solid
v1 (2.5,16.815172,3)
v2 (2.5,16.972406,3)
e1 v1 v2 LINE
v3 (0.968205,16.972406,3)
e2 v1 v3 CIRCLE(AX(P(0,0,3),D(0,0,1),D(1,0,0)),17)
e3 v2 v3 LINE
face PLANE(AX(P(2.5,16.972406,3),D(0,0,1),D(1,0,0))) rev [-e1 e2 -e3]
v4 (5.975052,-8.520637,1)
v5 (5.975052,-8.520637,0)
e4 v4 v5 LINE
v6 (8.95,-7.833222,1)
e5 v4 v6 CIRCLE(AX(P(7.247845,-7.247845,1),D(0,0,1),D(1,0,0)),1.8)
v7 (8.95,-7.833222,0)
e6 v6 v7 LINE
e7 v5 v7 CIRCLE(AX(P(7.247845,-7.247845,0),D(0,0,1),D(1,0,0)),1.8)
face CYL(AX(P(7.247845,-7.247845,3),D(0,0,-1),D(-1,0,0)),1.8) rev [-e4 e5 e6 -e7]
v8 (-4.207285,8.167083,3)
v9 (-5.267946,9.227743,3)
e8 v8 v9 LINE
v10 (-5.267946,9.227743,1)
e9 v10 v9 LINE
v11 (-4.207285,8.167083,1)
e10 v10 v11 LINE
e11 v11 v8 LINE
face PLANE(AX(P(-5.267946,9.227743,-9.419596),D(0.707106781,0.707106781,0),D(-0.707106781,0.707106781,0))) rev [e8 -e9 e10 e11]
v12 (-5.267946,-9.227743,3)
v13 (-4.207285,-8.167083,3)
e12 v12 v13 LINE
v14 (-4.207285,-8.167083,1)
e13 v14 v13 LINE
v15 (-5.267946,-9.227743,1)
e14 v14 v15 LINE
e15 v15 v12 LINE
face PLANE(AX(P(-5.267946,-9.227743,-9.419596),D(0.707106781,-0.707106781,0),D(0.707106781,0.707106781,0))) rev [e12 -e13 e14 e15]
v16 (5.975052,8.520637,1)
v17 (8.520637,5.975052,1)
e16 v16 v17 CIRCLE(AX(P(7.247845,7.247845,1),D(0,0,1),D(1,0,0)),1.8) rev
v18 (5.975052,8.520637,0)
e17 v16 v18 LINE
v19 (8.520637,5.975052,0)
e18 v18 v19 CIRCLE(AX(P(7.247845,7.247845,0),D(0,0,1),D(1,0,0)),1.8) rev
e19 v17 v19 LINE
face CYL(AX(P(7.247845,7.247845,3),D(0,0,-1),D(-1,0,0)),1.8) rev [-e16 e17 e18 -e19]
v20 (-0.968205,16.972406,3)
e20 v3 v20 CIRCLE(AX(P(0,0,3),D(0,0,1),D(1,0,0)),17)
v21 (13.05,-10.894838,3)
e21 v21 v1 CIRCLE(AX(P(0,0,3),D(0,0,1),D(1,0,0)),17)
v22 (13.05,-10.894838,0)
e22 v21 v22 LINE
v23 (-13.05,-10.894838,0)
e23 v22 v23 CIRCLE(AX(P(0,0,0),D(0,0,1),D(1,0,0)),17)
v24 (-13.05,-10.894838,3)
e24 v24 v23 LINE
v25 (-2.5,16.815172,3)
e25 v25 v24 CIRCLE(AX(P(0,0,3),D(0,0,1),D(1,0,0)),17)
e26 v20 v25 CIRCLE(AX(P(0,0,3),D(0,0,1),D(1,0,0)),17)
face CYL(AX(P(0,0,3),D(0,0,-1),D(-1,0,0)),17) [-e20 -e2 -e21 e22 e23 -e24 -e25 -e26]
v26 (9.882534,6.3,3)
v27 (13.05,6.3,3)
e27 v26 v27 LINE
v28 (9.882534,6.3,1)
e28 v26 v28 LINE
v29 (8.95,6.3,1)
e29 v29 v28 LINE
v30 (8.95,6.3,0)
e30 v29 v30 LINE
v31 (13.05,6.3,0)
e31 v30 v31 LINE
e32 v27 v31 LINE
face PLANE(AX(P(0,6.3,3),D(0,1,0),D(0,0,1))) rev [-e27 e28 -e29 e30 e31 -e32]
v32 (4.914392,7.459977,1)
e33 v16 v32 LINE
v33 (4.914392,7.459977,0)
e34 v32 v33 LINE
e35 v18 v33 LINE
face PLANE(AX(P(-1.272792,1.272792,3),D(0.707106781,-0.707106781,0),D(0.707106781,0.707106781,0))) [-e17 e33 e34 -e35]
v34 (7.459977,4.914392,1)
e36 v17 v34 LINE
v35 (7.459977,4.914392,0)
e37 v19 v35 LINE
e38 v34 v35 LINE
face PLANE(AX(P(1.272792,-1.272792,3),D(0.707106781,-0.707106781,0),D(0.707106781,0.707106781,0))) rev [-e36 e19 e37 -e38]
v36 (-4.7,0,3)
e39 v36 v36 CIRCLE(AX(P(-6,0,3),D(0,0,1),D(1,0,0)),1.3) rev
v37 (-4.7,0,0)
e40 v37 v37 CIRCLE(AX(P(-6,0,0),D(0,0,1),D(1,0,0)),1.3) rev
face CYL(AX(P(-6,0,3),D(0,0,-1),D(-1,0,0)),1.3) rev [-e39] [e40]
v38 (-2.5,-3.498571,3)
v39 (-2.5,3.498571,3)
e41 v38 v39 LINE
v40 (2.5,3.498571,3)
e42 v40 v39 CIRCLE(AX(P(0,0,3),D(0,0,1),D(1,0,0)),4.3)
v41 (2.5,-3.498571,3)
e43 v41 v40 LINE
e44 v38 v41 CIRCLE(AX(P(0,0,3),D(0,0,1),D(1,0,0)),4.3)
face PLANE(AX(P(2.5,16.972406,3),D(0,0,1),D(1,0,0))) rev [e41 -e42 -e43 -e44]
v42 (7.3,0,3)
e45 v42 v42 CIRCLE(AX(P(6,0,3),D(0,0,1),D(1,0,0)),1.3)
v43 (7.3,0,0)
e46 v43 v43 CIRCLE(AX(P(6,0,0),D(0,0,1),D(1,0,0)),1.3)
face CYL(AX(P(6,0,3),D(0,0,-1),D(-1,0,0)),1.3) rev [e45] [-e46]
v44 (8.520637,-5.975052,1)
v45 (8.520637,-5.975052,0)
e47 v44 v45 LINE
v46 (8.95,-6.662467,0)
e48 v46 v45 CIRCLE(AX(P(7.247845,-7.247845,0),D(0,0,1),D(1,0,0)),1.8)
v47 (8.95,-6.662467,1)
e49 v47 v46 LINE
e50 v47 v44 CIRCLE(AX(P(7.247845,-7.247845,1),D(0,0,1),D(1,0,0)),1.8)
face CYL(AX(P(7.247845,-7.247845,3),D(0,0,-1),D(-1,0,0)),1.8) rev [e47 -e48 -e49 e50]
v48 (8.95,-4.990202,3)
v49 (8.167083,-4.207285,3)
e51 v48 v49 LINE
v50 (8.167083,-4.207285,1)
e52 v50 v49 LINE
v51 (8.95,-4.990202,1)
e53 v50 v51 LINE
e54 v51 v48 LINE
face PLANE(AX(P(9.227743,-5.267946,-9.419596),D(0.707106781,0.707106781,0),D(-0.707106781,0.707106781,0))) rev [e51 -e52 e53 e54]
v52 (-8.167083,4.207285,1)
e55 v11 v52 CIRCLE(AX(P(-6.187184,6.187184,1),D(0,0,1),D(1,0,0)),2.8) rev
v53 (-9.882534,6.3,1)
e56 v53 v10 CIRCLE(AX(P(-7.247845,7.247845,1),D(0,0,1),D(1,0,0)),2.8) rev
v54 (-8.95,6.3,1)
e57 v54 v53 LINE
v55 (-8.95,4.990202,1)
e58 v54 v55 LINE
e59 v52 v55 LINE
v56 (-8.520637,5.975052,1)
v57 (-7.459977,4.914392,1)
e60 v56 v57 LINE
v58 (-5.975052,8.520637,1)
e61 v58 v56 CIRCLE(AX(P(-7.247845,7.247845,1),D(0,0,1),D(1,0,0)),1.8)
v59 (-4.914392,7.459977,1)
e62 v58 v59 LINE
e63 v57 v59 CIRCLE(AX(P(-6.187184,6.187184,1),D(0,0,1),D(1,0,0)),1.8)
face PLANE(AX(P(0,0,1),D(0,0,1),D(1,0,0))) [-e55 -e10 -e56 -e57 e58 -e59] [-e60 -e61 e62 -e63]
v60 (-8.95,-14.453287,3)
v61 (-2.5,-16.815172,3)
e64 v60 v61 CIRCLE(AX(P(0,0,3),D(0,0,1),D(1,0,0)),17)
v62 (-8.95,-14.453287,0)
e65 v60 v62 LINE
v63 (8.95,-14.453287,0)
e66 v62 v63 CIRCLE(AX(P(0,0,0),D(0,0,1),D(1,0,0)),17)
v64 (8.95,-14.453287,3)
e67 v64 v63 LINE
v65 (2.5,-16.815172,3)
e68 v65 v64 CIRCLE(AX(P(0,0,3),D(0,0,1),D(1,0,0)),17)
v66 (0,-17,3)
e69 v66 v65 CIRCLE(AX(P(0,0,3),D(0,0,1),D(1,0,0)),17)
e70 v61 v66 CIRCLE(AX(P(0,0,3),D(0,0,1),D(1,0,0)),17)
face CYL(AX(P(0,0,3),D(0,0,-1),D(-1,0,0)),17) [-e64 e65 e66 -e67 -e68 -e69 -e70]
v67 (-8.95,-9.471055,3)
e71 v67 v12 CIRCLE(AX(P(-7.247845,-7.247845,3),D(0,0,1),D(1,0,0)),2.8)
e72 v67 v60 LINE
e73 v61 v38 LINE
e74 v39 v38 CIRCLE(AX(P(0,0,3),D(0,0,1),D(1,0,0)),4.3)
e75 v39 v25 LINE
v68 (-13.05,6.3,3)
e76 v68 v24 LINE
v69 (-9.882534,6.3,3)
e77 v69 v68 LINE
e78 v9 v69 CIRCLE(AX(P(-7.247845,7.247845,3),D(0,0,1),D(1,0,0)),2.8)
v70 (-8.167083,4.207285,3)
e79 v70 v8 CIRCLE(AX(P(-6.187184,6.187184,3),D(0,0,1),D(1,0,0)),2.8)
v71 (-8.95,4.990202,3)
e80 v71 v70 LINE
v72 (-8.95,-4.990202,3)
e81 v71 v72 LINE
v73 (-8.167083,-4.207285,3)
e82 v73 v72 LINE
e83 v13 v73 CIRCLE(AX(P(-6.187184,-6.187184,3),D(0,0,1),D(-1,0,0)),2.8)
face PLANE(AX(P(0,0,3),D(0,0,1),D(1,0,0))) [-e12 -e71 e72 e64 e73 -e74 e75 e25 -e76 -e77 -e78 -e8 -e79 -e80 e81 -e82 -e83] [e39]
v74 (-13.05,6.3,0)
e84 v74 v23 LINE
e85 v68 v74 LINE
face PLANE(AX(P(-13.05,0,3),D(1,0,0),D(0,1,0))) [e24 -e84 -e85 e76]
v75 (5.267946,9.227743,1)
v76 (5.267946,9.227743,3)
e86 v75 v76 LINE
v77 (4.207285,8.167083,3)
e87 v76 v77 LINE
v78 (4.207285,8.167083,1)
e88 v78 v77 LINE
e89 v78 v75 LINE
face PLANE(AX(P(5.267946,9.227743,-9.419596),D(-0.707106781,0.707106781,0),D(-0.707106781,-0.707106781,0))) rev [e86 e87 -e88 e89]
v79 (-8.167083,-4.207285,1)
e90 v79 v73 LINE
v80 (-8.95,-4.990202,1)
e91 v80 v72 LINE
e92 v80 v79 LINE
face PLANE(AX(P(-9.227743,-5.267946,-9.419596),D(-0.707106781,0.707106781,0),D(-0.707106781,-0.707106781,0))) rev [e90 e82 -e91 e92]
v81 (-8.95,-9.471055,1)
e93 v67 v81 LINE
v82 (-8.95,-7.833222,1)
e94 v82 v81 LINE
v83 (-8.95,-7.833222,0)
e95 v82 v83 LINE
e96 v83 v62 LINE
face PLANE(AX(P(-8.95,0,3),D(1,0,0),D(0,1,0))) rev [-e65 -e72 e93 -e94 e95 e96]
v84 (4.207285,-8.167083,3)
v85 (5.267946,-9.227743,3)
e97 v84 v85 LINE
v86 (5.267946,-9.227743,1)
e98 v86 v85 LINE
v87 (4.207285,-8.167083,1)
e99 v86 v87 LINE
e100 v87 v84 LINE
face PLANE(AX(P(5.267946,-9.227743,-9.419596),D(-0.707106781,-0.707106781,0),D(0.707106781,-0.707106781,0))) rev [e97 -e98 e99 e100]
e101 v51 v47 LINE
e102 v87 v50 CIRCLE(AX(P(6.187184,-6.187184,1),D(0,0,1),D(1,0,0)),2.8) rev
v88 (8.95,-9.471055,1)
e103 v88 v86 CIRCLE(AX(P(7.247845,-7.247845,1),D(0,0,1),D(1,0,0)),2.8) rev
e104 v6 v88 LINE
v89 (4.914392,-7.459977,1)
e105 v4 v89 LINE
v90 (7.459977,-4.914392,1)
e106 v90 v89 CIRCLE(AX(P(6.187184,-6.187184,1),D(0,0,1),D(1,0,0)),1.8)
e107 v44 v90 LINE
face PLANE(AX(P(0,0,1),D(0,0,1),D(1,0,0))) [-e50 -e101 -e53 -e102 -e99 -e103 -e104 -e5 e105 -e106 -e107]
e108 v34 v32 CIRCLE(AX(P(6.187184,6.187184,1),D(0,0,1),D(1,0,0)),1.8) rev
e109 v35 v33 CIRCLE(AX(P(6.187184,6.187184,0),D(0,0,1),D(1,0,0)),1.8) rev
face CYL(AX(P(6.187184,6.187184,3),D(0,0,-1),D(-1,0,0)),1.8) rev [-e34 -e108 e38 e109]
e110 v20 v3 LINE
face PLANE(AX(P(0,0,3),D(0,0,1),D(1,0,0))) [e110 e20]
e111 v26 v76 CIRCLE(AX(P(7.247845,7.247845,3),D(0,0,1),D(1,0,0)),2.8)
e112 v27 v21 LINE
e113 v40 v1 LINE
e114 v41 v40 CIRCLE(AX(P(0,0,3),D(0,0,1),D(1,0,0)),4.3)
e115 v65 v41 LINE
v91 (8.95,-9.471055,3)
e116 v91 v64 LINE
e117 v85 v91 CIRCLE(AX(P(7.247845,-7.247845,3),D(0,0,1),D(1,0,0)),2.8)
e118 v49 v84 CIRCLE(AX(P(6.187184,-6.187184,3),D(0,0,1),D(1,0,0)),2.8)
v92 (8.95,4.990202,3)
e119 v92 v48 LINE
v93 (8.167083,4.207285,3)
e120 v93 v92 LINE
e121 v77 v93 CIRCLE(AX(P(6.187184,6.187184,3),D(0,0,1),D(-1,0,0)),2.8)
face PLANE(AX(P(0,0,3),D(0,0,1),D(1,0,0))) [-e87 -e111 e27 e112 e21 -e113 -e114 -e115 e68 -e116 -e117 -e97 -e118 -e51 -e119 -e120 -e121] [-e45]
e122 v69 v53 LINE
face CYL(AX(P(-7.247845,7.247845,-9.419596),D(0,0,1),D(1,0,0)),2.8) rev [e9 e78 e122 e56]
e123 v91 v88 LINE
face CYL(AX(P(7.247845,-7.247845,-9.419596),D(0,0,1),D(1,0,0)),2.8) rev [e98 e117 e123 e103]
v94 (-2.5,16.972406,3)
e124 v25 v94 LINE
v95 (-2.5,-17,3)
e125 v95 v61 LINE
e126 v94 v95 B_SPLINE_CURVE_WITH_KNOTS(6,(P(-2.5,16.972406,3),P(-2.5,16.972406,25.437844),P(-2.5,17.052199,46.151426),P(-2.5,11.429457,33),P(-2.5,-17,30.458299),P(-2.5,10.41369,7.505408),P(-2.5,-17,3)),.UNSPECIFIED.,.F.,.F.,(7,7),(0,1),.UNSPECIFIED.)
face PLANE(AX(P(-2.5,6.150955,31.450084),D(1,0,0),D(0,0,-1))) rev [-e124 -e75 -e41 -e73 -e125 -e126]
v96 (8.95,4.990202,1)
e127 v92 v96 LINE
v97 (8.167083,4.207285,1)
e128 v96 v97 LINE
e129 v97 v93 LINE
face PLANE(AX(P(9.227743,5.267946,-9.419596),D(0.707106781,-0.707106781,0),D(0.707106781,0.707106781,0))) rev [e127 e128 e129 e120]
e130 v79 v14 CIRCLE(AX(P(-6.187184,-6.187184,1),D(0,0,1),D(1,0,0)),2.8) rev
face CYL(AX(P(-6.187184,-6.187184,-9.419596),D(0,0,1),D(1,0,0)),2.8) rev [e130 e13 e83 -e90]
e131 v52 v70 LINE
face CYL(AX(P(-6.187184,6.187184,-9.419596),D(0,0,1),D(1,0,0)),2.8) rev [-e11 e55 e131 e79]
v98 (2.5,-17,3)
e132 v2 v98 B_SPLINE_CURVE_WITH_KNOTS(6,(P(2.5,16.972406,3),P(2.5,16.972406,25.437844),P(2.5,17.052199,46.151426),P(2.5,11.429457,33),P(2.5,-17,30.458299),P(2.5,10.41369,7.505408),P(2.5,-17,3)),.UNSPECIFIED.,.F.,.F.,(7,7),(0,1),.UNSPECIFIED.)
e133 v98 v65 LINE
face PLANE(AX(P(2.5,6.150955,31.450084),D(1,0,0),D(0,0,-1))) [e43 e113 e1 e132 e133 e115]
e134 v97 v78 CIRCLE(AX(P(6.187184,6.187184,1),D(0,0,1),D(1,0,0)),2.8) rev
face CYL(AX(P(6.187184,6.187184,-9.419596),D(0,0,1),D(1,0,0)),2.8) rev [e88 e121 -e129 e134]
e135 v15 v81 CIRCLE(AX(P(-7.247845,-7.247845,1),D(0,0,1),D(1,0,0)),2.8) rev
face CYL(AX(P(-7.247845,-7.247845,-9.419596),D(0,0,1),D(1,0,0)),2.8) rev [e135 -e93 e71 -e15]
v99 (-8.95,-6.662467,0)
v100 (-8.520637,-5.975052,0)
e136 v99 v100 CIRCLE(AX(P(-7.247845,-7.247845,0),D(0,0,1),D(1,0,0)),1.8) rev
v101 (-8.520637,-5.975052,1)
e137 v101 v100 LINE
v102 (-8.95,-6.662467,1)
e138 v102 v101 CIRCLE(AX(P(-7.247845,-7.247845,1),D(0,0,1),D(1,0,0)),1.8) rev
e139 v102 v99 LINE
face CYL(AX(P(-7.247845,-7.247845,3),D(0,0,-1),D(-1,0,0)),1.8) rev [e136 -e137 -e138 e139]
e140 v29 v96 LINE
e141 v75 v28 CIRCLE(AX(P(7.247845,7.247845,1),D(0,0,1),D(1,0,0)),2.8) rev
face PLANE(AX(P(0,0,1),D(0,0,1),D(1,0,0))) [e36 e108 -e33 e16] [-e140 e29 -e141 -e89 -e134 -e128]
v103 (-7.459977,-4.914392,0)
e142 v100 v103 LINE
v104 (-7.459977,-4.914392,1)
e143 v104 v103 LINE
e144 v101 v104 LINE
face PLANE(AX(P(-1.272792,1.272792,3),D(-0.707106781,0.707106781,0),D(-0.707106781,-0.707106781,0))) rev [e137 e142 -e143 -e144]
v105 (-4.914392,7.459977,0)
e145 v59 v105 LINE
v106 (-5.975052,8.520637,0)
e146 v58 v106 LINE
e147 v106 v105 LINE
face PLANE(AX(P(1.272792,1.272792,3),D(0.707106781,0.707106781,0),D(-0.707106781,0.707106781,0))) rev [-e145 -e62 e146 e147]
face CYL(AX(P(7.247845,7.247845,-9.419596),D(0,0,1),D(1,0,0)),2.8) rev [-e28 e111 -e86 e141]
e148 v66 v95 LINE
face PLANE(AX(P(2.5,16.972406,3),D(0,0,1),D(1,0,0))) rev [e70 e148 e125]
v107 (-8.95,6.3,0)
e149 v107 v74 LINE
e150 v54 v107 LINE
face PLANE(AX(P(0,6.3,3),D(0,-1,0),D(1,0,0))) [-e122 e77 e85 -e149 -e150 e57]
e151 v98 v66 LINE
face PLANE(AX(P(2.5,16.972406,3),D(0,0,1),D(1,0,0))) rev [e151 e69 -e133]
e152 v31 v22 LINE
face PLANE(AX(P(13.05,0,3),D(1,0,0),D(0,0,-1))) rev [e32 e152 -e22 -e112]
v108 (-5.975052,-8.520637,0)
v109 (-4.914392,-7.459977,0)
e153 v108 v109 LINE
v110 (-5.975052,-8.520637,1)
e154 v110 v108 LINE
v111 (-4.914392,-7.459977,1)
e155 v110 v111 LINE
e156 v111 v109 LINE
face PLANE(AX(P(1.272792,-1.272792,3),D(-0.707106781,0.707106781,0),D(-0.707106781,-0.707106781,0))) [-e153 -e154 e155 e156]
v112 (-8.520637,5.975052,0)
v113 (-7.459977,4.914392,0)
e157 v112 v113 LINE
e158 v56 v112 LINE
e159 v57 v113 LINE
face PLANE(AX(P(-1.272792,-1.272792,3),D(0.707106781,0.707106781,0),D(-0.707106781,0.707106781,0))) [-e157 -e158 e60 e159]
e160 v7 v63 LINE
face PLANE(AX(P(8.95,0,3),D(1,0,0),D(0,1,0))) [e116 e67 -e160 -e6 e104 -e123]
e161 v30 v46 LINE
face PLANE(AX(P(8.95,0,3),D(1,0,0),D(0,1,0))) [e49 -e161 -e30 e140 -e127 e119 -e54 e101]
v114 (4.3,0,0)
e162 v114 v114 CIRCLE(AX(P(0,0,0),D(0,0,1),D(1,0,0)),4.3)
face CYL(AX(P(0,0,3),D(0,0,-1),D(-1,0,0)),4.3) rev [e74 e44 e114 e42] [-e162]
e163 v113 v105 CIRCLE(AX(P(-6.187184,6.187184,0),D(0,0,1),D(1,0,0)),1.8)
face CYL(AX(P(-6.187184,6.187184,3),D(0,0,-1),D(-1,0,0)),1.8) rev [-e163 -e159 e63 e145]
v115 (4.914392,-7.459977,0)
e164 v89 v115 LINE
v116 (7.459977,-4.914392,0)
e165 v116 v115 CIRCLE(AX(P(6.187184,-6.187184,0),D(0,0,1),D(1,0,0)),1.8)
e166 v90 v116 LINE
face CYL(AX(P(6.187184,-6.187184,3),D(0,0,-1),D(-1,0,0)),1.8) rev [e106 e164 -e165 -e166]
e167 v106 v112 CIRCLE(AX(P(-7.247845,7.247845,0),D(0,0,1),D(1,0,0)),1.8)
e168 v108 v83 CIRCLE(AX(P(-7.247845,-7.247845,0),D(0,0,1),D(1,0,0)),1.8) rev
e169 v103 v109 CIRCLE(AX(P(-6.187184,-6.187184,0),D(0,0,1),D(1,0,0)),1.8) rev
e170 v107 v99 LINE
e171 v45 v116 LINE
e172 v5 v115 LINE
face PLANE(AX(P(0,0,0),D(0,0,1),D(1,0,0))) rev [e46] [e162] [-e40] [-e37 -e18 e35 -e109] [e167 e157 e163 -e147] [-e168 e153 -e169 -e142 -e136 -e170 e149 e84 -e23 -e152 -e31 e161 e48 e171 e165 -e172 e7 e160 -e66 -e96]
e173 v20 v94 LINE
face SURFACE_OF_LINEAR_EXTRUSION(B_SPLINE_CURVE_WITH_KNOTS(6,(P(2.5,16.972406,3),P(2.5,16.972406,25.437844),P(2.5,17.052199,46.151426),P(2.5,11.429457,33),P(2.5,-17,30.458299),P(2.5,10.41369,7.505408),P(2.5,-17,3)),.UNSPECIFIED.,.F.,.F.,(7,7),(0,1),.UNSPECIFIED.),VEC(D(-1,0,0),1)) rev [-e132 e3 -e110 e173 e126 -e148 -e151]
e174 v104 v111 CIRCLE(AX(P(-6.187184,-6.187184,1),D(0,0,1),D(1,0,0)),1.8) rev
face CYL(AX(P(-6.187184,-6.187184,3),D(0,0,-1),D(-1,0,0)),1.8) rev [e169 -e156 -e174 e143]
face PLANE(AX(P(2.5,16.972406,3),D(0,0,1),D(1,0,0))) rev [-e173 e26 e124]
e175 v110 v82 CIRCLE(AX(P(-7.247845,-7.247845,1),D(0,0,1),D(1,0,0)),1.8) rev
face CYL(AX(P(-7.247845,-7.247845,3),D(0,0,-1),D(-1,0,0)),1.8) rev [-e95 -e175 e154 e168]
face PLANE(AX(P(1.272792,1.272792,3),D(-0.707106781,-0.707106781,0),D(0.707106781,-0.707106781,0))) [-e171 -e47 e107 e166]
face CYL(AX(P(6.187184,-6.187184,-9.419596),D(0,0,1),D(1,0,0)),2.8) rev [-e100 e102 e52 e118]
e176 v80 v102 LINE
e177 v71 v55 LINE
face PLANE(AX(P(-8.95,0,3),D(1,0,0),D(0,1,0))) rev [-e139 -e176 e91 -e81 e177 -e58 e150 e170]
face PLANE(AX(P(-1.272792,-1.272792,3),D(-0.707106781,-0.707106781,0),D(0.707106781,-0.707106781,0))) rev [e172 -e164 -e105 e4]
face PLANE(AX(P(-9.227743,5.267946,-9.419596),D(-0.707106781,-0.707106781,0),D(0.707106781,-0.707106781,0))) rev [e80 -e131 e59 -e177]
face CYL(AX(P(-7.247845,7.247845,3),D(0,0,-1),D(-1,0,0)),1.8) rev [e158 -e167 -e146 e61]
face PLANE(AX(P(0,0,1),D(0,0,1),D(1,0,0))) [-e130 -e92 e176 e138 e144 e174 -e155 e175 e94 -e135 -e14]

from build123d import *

# Parameters (mm, degrees)
SKETCH_2_R          = 1.3
SKETCH_2_R_2        = 4.3
EXTRUDE_1_DEPTH     = 3
CUT_EXTRUDE_1_DEPTH = 2
EXTRUDE_START       = -2.5
EXTRUDE_2_DEPTH     = 5


# Read off the part's stored shape, not the designer's step: 凸台-拉伸2
with BuildPart() as part:
    # 草图2 → 凸台-拉伸1 (new body)
    with BuildSketch(Plane.XY):
        with BuildLine():
            Line((8.95, -6.662467126), (8.95, 6.3))
            Line((8.95, 6.3), (13.05, 6.3))
            Line((13.05, 6.3), (13.05, -10.894838227))
            ThreePointArc((13.05, -10.894838227), (15.982021149, -5.794393842), (17, 0))
            ThreePointArc((17, 0), (-5.794393842, 15.982021149), (-13.05, -10.894838227))
            Line((-13.05, -10.894838227), (-13.05, 6.3))
            Line((-13.05, 6.3), (-8.95, 6.3))
            Line((-8.95, 6.3), (-8.95, -6.662467126))
            ThreePointArc((-8.95, -6.662467126), (-8.774511871, -6.294279218), (-8.520636713, -5.975052301))
            Line((-8.520636713, -5.975052301), (-7.459976542, -4.914392129))
            ThreePointArc((-7.459976542, -4.914392129), (-4.914392129, -4.914392129), (-4.914392129, -7.459976542))
            Line((-4.914392129, -7.459976542), (-5.975052301, -8.520636713))
            ThreePointArc((-5.975052301, -8.520636713), (-7.65308887, -9.001633835), (-8.95, -7.833221888))
            Line((-8.95, -7.833221888), (-8.95, -14.453286823))
            ThreePointArc((-8.95, -14.453286823), (0, -17), (8.95, -14.453286823))
            Line((8.95, -14.453286823), (8.95, -7.833221888))
            ThreePointArc((8.95, -7.833221888), (7.65308887, -9.001633835), (5.975052301, -8.520636713))
            Line((5.975052301, -8.520636713), (4.914392129, -7.459976542))
            ThreePointArc((4.914392129, -7.459976542), (4.914392129, -4.914392129), (7.459976542, -4.914392129))
            Line((7.459976542, -4.914392129), (8.520636713, -5.975052301))
            ThreePointArc((8.520636713, -5.975052301), (8.774511871, -6.294279218), (8.95, -6.662467126))
        make_face()
        with Locations((-6, 0)):
            Circle(SKETCH_2_R, mode=Mode.SUBTRACT)
        with BuildLine():
            ThreePointArc((-8.520636713, 5.975052301), (-8.520636713, 8.520636713), (-5.975052301, 8.520636713))
            Line((-5.975052301, 8.520636713), (-4.914392129, 7.459976542))
            ThreePointArc((-4.914392129, 7.459976542), (-4.914392129, 4.914392129), (-7.459976542, 4.914392129))
            Line((-7.459976542, 4.914392129), (-8.520636713, 5.975052301))
        make_face(mode=Mode.SUBTRACT)
        Circle(SKETCH_2_R_2, mode=Mode.SUBTRACT)
        with Locations((6, 0)):
            Circle(SKETCH_2_R, mode=Mode.SUBTRACT)
        with BuildLine():
            Line((4.914392129, 7.459976542), (5.975052301, 8.520636713))
            ThreePointArc((5.975052301, 8.520636713), (8.520636713, 8.520636713), (8.520636713, 5.975052301))
            Line((8.520636713, 5.975052301), (7.459976542, 4.914392129))
            ThreePointArc((7.459976542, 4.914392129), (4.914392129, 4.914392129), (4.914392129, 7.459976542))
        make_face(mode=Mode.SUBTRACT)
    extrude(amount=EXTRUDE_1_DEPTH)

    # 草图10 → 切除-拉伸1 (cut)
    with BuildSketch(Plane.XY.offset(3)):
        with BuildLine():
            Line((-5.26794552, 9.227743494), (-4.207285348, 8.167083323))
            ThreePointArc((-4.207285348, 8.167083323), (-4.207285348, 4.207285348), (-8.167083323, 4.207285348))
            Line((-8.167083323, 4.207285348), (-9.227743494, 5.26794552))
            ThreePointArc((-9.227743494, 5.26794552), (-9.227743494, 9.227743494), (-5.26794552, 9.227743494))
        make_face()
        with BuildLine():
            Line((-5.26794552, -9.227743494), (-4.207285348, -8.167083323))
            ThreePointArc((-4.207285348, -8.167083323), (-4.207285348, -4.207285348), (-8.167083323, -4.207285348))
            Line((-8.167083323, -4.207285348), (-9.227743494, -5.26794552))
            ThreePointArc((-9.227743494, -5.26794552), (-9.227743494, -9.227743494), (-5.26794552, -9.227743494))
        make_face()
        with BuildLine():
            Line((5.26794552, 9.227743494), (4.207285348, 8.167083323))
            ThreePointArc((4.207285348, 8.167083323), (4.207285348, 4.207285348), (8.167083323, 4.207285348))
            Line((8.167083323, 4.207285348), (9.227743494, 5.26794552))
            ThreePointArc((9.227743494, 5.26794552), (9.227743494, 9.227743494), (5.26794552, 9.227743494))
        make_face()
        with BuildLine():
            Line((5.26794552, -9.227743494), (4.207285348, -8.167083323))
            ThreePointArc((4.207285348, -8.167083323), (4.207285348, -4.207285348), (8.167083323, -4.207285348))
            Line((8.167083323, -4.207285348), (9.227743494, -5.26794552))
            ThreePointArc((9.227743494, -5.26794552), (9.227743494, -9.227743494), (5.26794552, -9.227743494))
        make_face()
    extrude(amount=-CUT_EXTRUDE_1_DEPTH, mode=Mode.SUBTRACT)

    # 凸台-拉伸2 outline → 凸台-拉伸2 (add)
    with BuildSketch(Plane(origin=(0, 0, 0), x_dir=(0, 0, -1), z_dir=(1, 0, 0)).offset(EXTRUDE_START)):
        with BuildLine():
            Line((-3, -17), (-3, 16.972406415))
            add(Edge.make_bspline(
                [(-3, 16.972406415), (-25.437844455, 16.972406415), (-46.151426454, 17.052198571), (-33, 11.429456716), (-30.458299322, -17), (-7.505407539, 10.413690357), (-3, -17)],
                knots=[0, 0, 0, 0, 0, 0, 0, 1, 1, 1, 1, 1, 1, 1], degree=6))
        make_face()
    extrude(amount=EXTRUDE_2_DEPTH)


solid = part.part
